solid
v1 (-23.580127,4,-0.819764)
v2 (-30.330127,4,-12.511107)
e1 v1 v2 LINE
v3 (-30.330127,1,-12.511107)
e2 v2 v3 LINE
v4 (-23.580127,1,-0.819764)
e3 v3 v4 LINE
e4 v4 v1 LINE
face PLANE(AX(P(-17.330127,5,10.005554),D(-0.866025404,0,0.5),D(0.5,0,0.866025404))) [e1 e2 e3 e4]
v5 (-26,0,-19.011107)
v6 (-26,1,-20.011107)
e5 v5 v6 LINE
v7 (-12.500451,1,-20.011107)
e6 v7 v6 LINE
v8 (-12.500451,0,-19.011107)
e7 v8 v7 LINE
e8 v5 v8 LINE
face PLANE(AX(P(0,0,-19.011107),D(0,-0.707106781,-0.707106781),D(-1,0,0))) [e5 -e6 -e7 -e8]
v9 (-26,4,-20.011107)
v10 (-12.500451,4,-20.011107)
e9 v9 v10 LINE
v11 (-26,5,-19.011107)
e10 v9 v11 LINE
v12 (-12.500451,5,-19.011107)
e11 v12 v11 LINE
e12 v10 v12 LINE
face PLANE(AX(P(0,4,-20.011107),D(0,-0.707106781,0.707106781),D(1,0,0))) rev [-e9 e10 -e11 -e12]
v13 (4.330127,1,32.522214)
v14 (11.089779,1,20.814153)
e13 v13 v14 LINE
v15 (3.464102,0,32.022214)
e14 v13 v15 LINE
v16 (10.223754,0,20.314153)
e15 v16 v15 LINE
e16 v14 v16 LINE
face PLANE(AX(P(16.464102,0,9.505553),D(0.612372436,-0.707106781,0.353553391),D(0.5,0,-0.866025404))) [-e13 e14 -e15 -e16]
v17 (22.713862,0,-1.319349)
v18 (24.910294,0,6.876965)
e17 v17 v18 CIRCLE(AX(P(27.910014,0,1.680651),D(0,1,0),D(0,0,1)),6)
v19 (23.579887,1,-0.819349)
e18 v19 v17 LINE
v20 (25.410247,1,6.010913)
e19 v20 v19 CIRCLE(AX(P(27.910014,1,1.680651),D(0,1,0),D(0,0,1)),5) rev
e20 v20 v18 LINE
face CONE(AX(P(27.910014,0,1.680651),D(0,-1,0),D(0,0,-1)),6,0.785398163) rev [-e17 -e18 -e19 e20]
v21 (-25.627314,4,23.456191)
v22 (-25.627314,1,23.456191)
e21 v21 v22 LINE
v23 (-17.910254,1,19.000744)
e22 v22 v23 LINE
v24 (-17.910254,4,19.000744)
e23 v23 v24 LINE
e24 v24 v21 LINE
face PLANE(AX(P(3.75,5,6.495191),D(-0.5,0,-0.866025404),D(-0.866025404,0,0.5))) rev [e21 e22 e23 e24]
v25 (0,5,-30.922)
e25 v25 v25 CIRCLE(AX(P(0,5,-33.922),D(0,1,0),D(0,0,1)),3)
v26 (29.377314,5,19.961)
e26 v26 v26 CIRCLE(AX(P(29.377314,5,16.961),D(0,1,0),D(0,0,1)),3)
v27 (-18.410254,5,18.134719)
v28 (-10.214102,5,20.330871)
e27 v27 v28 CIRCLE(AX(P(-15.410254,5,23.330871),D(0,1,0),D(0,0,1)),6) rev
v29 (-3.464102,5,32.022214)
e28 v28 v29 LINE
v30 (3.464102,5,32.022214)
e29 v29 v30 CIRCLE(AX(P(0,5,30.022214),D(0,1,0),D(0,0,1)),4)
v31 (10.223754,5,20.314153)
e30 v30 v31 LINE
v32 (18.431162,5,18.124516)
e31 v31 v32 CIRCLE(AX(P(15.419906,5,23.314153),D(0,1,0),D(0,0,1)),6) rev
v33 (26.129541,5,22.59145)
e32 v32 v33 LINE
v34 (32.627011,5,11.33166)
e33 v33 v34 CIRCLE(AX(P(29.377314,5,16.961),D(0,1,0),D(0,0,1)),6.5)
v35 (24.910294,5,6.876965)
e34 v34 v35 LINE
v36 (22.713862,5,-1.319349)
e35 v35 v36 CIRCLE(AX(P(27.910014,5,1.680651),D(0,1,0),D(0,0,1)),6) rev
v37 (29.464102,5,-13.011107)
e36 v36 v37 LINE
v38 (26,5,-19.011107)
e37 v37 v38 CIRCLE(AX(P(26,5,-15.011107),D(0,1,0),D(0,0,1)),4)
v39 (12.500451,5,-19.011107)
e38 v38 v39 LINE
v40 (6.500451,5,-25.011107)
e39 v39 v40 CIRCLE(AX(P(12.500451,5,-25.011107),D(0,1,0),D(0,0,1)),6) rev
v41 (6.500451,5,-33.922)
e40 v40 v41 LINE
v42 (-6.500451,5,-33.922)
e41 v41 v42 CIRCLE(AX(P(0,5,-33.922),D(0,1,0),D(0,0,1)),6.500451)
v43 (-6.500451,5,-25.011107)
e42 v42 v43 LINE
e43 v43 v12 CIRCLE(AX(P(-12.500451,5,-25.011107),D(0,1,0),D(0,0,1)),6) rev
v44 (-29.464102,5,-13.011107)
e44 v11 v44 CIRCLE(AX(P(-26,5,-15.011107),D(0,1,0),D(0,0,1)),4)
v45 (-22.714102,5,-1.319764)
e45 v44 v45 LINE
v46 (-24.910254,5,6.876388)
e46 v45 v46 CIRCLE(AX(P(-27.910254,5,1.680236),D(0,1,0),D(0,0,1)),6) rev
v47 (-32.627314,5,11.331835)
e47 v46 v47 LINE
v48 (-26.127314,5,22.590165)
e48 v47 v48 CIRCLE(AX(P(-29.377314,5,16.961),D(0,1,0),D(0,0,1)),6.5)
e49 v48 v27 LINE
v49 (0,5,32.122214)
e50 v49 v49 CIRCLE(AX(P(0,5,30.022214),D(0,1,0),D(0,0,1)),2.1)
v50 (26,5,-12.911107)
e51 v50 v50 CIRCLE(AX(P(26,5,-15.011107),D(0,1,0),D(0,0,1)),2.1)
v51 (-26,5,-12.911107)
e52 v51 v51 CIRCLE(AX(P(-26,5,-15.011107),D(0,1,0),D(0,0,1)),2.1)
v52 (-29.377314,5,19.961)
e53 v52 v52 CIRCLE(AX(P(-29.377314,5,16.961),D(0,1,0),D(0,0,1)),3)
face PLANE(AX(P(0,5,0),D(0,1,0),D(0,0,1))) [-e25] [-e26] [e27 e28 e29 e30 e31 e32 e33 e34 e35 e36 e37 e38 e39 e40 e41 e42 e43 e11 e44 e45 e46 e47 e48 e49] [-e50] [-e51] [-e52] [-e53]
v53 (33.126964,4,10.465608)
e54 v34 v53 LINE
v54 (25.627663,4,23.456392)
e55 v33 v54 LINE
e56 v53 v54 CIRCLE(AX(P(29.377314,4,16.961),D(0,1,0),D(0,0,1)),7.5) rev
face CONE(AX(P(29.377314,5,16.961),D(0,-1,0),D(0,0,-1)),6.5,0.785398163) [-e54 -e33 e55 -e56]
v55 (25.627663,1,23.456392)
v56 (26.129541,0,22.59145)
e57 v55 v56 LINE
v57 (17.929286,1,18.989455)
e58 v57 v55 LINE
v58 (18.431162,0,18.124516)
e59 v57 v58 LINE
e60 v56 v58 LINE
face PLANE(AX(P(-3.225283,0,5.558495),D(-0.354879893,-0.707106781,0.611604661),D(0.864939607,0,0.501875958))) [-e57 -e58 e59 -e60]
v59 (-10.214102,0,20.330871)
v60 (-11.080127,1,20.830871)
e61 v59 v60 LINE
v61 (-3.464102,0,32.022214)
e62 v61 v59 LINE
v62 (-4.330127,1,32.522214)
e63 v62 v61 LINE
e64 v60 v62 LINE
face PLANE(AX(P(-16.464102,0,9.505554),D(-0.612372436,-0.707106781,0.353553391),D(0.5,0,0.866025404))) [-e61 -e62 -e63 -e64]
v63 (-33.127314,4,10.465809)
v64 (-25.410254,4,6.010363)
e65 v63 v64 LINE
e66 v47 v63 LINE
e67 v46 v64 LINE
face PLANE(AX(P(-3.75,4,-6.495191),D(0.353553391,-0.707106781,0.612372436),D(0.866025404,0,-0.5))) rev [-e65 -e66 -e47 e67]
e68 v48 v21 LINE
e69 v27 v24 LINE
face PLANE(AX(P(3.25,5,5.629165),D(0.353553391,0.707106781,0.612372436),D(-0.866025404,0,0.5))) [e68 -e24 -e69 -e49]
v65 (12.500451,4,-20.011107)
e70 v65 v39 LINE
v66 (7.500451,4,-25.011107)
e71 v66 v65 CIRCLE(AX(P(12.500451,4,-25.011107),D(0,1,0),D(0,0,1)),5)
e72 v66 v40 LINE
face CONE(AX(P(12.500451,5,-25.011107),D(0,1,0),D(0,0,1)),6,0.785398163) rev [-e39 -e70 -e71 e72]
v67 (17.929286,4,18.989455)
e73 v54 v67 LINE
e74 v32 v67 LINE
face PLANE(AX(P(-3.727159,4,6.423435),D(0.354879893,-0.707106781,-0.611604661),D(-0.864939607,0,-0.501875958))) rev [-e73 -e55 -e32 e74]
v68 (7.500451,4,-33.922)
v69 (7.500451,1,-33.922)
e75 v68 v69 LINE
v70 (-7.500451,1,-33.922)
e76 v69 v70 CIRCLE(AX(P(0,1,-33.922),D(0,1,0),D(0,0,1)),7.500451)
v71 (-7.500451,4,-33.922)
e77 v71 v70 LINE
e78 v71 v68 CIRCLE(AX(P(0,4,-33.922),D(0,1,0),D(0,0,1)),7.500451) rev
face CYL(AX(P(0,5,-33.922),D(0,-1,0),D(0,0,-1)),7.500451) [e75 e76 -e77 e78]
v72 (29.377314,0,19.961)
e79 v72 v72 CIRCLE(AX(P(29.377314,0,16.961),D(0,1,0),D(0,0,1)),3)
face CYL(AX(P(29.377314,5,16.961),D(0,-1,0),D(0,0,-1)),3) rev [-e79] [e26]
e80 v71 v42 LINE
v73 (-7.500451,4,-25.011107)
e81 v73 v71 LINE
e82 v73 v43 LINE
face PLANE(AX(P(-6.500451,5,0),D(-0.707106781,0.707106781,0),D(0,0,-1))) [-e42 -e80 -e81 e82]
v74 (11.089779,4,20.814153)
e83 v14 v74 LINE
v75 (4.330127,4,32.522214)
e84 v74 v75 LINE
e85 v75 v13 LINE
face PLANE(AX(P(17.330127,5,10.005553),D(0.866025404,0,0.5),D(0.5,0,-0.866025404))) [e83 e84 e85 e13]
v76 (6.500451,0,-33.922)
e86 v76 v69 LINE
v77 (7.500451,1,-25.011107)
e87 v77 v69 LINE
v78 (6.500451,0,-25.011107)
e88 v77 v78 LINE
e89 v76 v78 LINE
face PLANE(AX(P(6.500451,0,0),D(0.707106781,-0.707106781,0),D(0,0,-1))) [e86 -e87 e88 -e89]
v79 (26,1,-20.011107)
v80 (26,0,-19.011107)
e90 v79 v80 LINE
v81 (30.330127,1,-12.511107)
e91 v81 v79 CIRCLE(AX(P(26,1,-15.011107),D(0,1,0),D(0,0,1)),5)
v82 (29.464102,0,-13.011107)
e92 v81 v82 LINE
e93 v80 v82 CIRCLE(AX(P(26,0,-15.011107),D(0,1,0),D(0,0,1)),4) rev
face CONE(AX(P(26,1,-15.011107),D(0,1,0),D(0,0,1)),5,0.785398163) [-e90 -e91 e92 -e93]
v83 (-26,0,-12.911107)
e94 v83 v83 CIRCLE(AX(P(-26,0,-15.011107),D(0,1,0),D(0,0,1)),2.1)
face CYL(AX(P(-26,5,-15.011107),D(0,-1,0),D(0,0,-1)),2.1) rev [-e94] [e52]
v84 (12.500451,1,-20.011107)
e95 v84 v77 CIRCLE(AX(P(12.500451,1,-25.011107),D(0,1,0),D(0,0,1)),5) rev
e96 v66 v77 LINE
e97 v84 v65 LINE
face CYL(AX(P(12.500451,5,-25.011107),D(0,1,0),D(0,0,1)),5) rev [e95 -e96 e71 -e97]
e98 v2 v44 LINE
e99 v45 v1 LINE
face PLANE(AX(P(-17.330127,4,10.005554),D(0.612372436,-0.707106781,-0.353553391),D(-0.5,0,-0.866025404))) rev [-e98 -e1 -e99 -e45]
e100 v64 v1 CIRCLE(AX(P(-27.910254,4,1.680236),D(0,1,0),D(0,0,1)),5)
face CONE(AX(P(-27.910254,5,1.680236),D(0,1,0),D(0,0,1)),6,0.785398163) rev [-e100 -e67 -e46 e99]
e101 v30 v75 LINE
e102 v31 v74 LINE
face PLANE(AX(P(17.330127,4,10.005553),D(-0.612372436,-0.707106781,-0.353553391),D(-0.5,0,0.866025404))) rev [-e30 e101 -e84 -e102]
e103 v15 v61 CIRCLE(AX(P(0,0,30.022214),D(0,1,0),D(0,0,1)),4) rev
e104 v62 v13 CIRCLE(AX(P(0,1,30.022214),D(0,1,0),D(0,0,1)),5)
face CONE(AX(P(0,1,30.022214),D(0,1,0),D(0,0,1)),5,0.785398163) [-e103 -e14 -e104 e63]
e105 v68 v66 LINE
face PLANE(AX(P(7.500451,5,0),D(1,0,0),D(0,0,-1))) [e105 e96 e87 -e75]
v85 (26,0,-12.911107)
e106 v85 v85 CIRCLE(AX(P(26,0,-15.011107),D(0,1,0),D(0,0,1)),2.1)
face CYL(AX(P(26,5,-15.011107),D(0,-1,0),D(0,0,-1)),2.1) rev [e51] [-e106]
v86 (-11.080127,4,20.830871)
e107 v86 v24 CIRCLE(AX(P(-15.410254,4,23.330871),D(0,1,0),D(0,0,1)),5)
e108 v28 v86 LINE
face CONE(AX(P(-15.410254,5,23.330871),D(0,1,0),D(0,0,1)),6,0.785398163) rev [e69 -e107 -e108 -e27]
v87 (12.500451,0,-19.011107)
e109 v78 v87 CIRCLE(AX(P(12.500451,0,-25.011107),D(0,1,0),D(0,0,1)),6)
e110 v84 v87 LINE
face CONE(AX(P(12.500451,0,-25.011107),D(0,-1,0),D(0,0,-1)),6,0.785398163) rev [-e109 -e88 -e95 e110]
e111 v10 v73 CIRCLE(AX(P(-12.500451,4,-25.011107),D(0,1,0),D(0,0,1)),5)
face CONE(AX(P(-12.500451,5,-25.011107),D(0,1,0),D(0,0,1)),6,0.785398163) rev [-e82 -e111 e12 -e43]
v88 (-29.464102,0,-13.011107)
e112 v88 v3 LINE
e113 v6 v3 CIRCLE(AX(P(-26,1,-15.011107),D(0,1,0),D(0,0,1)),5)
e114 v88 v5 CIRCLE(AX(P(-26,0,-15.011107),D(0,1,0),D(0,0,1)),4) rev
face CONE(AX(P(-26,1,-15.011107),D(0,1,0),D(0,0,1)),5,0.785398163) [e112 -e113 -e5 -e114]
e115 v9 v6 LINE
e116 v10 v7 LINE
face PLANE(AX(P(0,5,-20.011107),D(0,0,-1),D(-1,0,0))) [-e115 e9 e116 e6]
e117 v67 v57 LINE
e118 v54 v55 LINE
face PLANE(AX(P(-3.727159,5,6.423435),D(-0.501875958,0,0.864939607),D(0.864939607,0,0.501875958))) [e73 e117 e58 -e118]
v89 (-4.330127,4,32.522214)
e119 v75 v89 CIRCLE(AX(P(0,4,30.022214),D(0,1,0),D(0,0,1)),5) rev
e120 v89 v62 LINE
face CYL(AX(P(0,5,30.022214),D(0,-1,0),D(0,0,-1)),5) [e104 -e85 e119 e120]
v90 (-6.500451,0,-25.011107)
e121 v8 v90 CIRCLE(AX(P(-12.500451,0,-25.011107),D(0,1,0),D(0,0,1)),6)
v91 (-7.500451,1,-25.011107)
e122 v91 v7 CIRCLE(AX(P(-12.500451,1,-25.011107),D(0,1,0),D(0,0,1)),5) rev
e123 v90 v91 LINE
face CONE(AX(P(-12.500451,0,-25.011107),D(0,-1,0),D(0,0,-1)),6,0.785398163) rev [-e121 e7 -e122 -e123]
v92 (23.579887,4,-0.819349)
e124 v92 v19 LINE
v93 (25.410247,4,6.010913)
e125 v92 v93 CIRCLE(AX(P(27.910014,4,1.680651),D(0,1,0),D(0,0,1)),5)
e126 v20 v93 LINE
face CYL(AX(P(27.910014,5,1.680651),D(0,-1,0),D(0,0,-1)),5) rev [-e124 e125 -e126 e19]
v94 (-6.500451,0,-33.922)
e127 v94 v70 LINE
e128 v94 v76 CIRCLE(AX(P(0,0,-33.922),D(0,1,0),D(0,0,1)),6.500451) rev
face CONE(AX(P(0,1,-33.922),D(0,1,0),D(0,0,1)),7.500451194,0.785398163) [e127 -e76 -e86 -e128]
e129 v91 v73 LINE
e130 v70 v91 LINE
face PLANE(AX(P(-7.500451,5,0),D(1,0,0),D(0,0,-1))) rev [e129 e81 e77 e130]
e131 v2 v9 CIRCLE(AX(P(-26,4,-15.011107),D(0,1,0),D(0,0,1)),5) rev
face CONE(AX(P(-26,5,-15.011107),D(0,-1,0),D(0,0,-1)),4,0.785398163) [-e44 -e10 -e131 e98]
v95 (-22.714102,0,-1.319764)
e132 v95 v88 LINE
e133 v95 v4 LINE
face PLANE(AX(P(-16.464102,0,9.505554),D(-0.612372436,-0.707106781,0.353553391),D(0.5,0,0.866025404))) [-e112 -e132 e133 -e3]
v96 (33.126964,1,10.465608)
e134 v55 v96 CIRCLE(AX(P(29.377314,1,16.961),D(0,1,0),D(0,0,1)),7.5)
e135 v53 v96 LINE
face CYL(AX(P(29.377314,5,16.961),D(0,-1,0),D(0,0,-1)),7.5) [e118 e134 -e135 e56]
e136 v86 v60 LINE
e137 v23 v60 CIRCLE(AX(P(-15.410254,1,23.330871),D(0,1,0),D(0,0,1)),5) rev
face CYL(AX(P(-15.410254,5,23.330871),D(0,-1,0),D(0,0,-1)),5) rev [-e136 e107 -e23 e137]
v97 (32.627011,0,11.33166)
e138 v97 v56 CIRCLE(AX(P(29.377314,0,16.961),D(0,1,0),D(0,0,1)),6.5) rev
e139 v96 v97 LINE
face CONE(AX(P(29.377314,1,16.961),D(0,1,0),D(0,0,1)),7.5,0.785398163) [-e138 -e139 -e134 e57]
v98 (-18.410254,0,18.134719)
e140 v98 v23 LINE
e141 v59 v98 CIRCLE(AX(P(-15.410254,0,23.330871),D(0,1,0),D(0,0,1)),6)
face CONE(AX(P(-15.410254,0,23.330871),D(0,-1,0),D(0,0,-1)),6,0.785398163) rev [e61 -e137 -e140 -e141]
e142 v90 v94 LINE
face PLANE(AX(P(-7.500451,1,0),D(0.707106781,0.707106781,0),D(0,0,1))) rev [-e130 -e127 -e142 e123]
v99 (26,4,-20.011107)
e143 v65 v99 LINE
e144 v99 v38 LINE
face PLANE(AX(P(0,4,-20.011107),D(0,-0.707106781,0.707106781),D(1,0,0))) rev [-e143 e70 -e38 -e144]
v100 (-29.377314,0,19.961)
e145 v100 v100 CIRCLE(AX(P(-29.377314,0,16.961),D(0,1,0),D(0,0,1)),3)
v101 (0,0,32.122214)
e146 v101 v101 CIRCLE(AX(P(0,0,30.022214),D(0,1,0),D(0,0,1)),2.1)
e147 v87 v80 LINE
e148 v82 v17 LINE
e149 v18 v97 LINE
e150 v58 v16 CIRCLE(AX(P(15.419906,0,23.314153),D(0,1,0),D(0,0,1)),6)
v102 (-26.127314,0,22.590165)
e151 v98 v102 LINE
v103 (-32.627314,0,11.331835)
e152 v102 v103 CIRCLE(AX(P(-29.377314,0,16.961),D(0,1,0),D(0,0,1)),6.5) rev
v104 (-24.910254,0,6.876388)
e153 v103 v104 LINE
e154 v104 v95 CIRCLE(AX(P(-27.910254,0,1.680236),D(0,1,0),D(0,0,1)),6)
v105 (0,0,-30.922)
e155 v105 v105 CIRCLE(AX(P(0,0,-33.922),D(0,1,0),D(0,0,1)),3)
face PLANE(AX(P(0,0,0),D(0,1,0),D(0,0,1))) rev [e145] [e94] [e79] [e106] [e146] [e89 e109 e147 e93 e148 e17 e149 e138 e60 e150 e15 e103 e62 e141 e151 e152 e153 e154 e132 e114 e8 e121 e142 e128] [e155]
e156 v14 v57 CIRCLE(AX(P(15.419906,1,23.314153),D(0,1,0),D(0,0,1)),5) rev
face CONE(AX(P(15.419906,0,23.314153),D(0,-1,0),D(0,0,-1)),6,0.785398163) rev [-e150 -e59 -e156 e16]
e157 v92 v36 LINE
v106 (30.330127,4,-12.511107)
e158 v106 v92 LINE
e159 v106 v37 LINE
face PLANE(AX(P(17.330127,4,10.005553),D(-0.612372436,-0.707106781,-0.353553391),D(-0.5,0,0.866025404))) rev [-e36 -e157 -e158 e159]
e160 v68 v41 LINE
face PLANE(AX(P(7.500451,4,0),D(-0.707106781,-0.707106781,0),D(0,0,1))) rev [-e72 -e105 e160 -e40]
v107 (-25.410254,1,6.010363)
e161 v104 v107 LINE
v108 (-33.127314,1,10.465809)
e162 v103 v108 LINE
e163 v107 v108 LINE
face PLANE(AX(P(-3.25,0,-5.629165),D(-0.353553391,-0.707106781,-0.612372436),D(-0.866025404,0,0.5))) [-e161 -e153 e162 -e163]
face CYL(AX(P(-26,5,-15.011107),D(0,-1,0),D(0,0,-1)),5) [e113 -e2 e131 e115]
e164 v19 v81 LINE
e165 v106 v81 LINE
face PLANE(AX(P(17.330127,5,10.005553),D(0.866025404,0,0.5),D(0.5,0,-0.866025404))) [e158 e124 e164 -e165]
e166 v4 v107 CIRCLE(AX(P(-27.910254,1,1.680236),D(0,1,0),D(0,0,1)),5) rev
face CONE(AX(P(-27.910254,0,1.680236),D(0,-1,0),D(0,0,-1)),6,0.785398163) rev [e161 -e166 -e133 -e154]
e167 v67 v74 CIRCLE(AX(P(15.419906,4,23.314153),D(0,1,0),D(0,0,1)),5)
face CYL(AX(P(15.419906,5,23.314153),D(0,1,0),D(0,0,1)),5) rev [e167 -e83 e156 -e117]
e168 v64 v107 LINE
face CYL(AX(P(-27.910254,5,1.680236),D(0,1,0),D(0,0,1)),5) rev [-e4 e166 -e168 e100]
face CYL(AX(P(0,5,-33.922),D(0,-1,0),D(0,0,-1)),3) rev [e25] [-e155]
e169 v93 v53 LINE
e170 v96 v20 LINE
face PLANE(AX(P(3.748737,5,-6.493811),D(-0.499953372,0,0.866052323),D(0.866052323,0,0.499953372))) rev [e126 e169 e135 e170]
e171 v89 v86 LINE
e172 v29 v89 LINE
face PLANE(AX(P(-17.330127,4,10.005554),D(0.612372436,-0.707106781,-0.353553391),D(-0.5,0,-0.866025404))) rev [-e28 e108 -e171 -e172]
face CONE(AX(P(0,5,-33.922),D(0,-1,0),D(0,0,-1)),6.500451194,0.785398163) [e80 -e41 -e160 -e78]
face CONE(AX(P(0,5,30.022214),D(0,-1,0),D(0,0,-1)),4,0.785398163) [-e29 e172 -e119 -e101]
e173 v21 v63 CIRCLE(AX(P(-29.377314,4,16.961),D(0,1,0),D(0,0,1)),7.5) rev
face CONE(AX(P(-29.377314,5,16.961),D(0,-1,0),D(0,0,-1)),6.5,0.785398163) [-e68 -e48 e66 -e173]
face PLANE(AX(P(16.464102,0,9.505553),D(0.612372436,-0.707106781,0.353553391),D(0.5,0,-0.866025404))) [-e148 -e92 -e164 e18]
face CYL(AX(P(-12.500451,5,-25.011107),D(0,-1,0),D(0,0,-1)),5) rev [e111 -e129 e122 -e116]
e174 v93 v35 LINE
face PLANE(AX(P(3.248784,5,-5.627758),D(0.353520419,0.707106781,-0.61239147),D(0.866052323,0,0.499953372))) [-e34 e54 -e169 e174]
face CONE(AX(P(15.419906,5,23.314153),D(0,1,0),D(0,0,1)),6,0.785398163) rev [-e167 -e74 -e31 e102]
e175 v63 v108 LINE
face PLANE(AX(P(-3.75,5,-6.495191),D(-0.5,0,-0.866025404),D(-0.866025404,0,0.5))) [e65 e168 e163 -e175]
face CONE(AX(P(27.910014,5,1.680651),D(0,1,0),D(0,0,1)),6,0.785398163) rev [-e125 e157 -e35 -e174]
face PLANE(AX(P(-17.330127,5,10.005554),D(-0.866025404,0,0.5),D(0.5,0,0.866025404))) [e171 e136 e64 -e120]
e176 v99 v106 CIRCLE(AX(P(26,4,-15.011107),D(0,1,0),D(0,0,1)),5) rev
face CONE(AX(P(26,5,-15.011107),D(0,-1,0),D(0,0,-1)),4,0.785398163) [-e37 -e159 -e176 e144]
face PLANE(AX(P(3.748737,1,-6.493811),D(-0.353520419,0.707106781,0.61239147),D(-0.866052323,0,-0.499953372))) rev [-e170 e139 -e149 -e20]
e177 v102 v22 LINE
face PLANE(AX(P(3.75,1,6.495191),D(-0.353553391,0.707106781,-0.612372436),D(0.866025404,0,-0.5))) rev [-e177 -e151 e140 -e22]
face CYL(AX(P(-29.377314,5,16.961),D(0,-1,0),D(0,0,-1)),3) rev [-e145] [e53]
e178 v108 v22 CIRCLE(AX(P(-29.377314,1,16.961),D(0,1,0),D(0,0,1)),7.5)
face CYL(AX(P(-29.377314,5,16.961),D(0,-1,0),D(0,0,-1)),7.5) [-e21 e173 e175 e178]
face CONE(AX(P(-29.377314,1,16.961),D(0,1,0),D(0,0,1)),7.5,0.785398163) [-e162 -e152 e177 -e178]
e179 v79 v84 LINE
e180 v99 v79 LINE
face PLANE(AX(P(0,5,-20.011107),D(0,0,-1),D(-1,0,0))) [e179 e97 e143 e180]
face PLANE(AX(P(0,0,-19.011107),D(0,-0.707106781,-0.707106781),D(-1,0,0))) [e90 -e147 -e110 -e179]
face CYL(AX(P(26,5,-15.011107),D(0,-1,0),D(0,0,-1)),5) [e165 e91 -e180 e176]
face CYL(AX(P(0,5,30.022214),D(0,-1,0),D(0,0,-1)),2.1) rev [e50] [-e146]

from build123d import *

# Parameters (mm, degrees)
EXTRUDE_2_OUTLINE_R   = 3
EXTRUDE_2_OUTLINE_R_2 = 2.1
EXTRUDE_2_DEPTH       = 5
FILLET_1_R            = 5
CHAMFER_1_SIZE        = 1
CHAMFER_2_SIZE        = 1


# Read off the part's stored shape, not the designer's step: ﾎﾞｽ - 押し出し2
with BuildPart() as part:
    # ﾎﾞｽ - 押し出し2 outline → ﾎﾞｽ - 押し出し2 (new body)
    with BuildSketch(Plane(origin=(0, 0, 0), x_dir=(1, 0, 0), z_dir=(0, 1, 0))):
        with BuildLine():
            Line((-25.627313747, -23.456190528), (-13.58012702, -16.500744028))
            Line((-13.58012702, -16.500744028), (-4.330127019, -32.522214))
            ThreePointArc((-4.330127019, -32.522214), (0, -35.022214), (4.330127019, -32.522214))
            Line((4.330127019, -32.522214), (13.595203608, -16.474630613))
            Line((13.595203608, -16.474630613), (25.627663459, -23.456392422))
            ThreePointArc((25.627663459, -23.456392422), (35.872706169, -20.710650288), (33.126964036, -10.465607578))
            Line((33.126964036, -10.465607578), (21.079752539, -3.511011592))
            Line((21.079752539, -3.511011592), (30.330127021, 12.511107))
            ThreePointArc((30.330127021, 12.511107), (30.330127021, 17.511107), (26.000000002, 20.011107))
            Line((26.000000002, 20.011107), (7.500451194, 20.011107))
            Line((7.500451194, 20.011107), (7.500451194, 33.922))
            ThreePointArc((7.500451194, 33.922), (0, 41.422451194), (-7.500451194, 33.922))
            Line((-7.500451194, 33.922), (-7.500451194, 20.011107))
            Line((-7.500451194, 20.011107), (-26.000000002, 20.011107))
            ThreePointArc((-26.000000002, 20.011107), (-30.330127021, 17.511107), (-30.330127021, 12.511107))
            Line((-30.330127021, 12.511107), (-21.08012702, -3.510362972))
            Line((-21.08012702, -3.510362972), (-33.127313747, -10.465809472))
            ThreePointArc((-33.127313747, -10.465809472), (-35.872504276, -20.711), (-25.627313747, -23.456190528))
        make_face()
        with Locations((-29.377313747, -16.961)):
            Circle(EXTRUDE_2_OUTLINE_R, mode=Mode.SUBTRACT)
        with Locations((0, -30.022214)):
            Circle(EXTRUDE_2_OUTLINE_R_2, mode=Mode.SUBTRACT)
        with Locations((29.377313747, -16.961)):
            Circle(EXTRUDE_2_OUTLINE_R, mode=Mode.SUBTRACT)
        with Locations((-26.000000002, 15.011107)):
            Circle(EXTRUDE_2_OUTLINE_R_2, mode=Mode.SUBTRACT)
        with Locations((26.000000002, 15.011107)):
            Circle(EXTRUDE_2_OUTLINE_R_2, mode=Mode.SUBTRACT)
        with Locations((0, 33.922)):
            Circle(EXTRUDE_2_OUTLINE_R, mode=Mode.SUBTRACT)
    extrude(amount=EXTRUDE_2_DEPTH)

    # ﾌｨﾚｯﾄ1
    fillet_1_edges = [part.edges().sort_by_distance(p)[0] for p in [
        (-13.58012702, 2.5, 16.500744028),
        (-21.08012702, 2.5, 3.510362972),
        (-7.500451194, 2.5, -20.011107),
        (7.500451194, 2.5, -20.011107),
        (21.079752539, 2.5, 3.511011592),
        (13.595203608, 2.5, 16.474630613),
    ]]
    fillet(fillet_1_edges, radius=FILLET_1_R)

    # 面取り1
    chamfer_1_edges = [part.edges().sort_by_distance(p)[0] for p in [
        (-14.116158813, 0, 18.501241916),
        (-21.768783893, 0, 21.228467278),
        (-35.872504276, 0, 20.711),
        (-29.268783893, 0, 8.238086222),
        (-30.330127021, 0, -17.511107),
        (-19.250225598, 0, -20.011107),
        (-7.500451194, 0, -29.4665535),
        (0, 0, -41.422451194),
        (7.500451194, 0, -29.4665535),
        (30.330127021, 0, -17.511107),
        (26.955007083, 0, -6.665227785),
        (29.26860567, 0, 8.238260311),
        (35.872706169, 0, 20.710650288),
        (21.778474587, 0, 21.222923938),
        (0, 0, 35.022214),
        (-7.705127019, 0, 26.676542524),
        (7.709952964, 0, 26.668183744),
        (19.250225598, 0, -20.011107),
        (-26.95512702, 0, -6.665435523),
        (14.131045637, 0, 18.483124699),
        (23.080419871, 0, 2.97487667),
        (8.964917288, 0, -21.475573094),
        (-8.964917288, 0, -21.475573094),
        (-23.080624907, 0, 2.974331179),
    ]]
    chamfer(chamfer_1_edges, length=CHAMFER_1_SIZE)

    # 面取り2
    chamfer_2_edges = [part.edges().sort_by_distance(p)[0] for p in [
        (-7.705127019, 5, 26.676542524),
        (-23.080624907, 5, 2.974331179),
        (-14.116158813, 5, 18.501241916),
        (0, 5, 35.022214),
        (21.778474587, 5, 21.222923938),
        (35.872706169, 5, 20.710650288),
        (29.26860567, 5, 8.238260311),
        (26.955007083, 5, -6.665227785),
        (30.330127021, 5, -17.511107),
        (7.500451194, 5, -29.4665535),
        (0, 5, -41.422451194),
        (-7.500451194, 5, -29.4665535),
        (-19.250225598, 5, -20.011107),
        (-30.330127021, 5, -17.511107),
        (-29.268783893, 5, 8.238086222),
        (-35.872504276, 5, 20.711),
        (7.709952964, 5, 26.668183744),
        (-21.768783893, 5, 21.228467278),
        (19.250225598, 5, -20.011107),
        (-26.95512702, 5, -6.665435523),
        (14.131045637, 5, 18.483124699),
        (23.080419871, 5, 2.97487667),
        (8.964917288, 5, -21.475573094),
        (-8.964917288, 5, -21.475573094),
    ]]
    chamfer(chamfer_2_edges, length=CHAMFER_2_SIZE)


solid = part.part
